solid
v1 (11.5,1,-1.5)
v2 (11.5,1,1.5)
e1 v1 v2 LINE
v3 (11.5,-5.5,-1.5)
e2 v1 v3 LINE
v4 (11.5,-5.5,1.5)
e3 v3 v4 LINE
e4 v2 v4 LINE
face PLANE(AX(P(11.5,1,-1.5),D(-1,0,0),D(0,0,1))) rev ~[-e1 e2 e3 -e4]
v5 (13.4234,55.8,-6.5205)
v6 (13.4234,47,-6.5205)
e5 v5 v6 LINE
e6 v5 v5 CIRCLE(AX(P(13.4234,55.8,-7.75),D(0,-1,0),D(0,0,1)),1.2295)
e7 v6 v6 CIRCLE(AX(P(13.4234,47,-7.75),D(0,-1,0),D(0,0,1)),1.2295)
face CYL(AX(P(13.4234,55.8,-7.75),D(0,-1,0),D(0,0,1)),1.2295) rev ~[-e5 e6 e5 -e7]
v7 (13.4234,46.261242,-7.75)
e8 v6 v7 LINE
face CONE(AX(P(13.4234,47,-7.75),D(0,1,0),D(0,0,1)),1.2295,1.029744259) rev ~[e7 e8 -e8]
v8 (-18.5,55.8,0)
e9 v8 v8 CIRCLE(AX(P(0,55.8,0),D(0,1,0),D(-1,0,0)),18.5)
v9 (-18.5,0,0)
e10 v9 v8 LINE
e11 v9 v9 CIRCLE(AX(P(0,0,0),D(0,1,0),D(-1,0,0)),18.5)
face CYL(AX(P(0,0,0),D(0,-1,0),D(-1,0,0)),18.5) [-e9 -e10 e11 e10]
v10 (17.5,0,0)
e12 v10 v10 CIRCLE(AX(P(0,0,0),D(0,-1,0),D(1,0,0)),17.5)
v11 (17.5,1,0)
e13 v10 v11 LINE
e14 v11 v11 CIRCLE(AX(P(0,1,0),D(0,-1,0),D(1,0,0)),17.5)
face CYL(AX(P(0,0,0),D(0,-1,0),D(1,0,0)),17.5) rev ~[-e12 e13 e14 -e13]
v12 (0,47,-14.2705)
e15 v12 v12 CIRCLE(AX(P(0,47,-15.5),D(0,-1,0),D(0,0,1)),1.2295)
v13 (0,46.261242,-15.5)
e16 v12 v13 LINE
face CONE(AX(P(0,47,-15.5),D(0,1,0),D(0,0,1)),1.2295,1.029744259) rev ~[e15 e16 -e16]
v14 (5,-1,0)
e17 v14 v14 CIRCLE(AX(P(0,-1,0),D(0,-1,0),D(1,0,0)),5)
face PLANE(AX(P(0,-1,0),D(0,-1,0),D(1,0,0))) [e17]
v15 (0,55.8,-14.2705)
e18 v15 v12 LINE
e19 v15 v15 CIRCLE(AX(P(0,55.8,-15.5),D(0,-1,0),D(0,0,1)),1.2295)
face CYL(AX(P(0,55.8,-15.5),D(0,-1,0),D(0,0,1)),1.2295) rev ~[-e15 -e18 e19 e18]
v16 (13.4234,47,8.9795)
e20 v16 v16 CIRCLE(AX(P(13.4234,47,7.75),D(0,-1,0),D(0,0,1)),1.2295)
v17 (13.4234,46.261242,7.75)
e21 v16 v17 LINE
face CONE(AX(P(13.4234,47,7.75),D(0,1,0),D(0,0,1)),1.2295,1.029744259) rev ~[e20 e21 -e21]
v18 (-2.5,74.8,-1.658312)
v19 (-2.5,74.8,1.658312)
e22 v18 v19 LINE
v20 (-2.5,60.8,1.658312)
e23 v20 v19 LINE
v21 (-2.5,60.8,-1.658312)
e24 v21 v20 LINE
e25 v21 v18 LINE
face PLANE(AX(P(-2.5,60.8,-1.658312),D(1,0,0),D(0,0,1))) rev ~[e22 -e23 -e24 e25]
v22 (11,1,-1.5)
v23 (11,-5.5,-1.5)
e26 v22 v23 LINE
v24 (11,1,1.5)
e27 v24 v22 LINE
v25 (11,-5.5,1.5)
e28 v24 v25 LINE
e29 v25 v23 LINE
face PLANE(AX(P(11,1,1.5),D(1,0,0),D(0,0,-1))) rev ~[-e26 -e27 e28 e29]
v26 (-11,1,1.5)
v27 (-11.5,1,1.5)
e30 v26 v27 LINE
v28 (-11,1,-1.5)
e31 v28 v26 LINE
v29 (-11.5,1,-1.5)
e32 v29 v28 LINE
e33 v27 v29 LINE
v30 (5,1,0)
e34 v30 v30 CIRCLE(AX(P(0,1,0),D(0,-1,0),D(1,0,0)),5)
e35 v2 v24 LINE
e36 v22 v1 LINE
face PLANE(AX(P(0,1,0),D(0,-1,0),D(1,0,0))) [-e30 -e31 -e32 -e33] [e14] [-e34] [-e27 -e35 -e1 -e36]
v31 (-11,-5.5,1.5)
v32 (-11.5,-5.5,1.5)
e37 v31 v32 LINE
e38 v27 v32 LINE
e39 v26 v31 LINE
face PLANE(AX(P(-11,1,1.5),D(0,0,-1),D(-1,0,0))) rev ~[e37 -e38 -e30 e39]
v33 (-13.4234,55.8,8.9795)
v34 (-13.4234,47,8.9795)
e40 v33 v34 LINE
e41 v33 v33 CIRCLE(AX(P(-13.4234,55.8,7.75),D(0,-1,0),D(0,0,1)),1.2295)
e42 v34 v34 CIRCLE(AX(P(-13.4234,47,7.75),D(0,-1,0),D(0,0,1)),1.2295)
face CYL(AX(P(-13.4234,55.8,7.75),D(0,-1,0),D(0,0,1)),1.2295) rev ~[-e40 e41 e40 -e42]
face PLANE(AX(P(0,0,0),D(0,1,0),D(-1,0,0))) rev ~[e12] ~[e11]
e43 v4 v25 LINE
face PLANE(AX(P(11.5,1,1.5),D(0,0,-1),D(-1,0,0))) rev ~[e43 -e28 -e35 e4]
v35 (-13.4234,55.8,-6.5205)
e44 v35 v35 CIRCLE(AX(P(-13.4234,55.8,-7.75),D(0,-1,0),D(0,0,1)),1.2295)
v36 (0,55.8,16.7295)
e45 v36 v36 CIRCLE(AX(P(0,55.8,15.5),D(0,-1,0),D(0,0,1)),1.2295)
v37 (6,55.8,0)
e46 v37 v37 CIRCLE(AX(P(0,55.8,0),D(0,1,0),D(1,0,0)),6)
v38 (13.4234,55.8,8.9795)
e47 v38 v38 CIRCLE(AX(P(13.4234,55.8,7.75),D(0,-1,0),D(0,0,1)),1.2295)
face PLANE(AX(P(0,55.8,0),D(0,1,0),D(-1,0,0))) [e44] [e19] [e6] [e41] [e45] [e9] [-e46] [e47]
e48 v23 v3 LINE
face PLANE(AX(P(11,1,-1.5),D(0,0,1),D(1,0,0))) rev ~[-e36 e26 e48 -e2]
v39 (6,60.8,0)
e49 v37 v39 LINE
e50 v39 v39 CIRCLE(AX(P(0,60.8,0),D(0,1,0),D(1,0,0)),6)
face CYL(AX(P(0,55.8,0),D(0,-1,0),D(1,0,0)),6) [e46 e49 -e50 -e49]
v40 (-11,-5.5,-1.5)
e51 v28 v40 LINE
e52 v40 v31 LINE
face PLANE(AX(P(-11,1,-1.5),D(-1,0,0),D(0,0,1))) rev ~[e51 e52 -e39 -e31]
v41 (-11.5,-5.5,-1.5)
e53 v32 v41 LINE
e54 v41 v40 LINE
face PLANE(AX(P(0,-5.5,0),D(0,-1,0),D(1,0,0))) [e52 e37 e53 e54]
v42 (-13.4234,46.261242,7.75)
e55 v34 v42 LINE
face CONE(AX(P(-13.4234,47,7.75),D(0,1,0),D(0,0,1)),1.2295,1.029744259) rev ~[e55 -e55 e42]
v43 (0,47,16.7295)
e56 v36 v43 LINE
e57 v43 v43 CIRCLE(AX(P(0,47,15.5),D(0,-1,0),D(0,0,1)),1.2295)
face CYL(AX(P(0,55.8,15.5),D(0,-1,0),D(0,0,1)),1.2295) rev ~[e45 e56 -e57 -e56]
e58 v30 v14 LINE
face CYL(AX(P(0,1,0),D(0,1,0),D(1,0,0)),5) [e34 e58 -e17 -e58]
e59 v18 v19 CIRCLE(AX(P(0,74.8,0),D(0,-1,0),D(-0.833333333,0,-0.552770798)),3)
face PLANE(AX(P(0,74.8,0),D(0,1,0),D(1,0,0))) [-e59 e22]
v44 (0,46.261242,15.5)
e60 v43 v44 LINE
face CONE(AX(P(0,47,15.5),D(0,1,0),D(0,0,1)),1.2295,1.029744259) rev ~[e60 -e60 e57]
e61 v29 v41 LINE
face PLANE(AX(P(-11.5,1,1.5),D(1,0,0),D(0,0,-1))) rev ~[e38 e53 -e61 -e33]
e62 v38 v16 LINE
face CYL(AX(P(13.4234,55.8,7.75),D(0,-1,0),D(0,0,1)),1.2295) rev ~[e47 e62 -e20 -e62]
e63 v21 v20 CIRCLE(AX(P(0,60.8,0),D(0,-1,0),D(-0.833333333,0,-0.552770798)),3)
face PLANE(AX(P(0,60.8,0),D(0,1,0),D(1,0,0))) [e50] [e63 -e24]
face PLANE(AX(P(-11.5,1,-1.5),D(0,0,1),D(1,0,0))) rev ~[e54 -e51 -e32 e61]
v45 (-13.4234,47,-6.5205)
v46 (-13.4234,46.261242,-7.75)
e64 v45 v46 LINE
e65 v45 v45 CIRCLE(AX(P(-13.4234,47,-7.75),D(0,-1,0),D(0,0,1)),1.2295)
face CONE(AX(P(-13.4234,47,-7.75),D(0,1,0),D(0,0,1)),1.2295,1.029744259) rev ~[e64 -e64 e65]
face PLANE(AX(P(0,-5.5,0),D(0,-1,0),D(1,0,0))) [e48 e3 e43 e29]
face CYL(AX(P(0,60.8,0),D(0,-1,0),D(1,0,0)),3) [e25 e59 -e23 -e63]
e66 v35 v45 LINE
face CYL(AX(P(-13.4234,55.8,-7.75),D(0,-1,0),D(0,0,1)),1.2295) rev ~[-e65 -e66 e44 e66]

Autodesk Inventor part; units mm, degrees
ref_plane "YZ Plane" through (0, 0, 0) normal (1, 0, 0) x (0, 1, 0)
ref_plane "XZ Plane" through (0, 0, 0) normal (0, 1, 0) x (-1, 0, 0)
ref_plane "XY Plane" through (0, 0, 0) normal (0, 0, 1) x (1, 0, 0)
sketch "Sketch1" plane through (0, 0, 0) normal (0, 1, 0) x (-1, 0, 0)
  circle A0 centre (0, 0) radius 18.5
  dimension "d0" = 37
extrude "Extrusion1" add sketch "Sketch1" along normal blind 55.8
sketch "Sketch2" plane through (0, 55.8, 0) normal (0, 1, 0) x (1, 0, 0)
  circle A0 centre (0, 0) radius 6
  dimension "d3" = 12
extrude "Extrusion2" add sketch "Sketch2" along normal blind 5
sketch "Sketch3" plane through (0, 60.8, 0) normal (0, 1, 0) x (1, 0, 0)
  circle A0 centre (0, 0) radius 3
  line L0 (-2.5, -3) -> (3, -3)
  line L1 (3, -3) -> (3, 3)
  line L2 (3, 3) -> (-2.5, 3)
  line L3 (-2.5, 3) -> (-2.5, -3)
  point P0 (-2.5, 1.6583)
  point P1 (-2.5, -1.6583)
  dimension "d6" = 6
  dimension "d7" = 5.5
extrude "Extrusion3" add sketch "Sketch3" along normal blind 14 contours A0 L3 picked at (0.6006, -0.3482)
sketch "Sketch4" plane through (0, 0, 0) normal (0, -1, 0) x (1, 0, 0)
  circle A0 centre (0, 0) radius 17.5
  circle A1 centre (0, 0) radius 18.5 projected
  dimension "d27" = 1
extrude "Extrusion4" cut sketch "Sketch4" against normal blind 1 contours A0
sketch "Sketch5" plane through (0, 1, 0) normal (0, -1, 0) x (1, 0, 0)
  circle A0 centre (0, 0) radius 18.5 projected
  circle A1 centre (0, 0) radius 5
  dimension "d13" = 10
extrude "Extrusion5" add sketch "Sketch5" along normal blind 2 contours A1
sketch "Sketch7" plane through (0, 55.8, 0) normal (0, 1, 0) x (1, 0, 0)
  line L0 (0, 25.9) -> (0, -25.9) projected
  point P0 (0, 0)
  point P1 (0, 15.5)
  point P2 (-13.4234, 7.75)
  point P3 (-13.4234, -7.75)
  point P4 (0, -15.5)
  point P5 (13.4234, -7.75)
  point P6 (13.4234, 7.75)
  dimension "d35" = 15.5
  dimension "d38" = 360
hole "Hole1" at (-13.4234, 55.8, -7.75) at (-13.4234, 55.8, 7.75) at (13.4234, 55.8, 7.75) at (13.4234, 55.8, -7.75) at (0, 55.8, -15.5) at (0, 55.8, 15.5) direction (0, -1, 0) diameter 2.459 depth 8.8 tip angle 118 thread size "M3x0.5" class "6H" standard "ANSI Metric M Profile"
sketch "Sketch8" plane through (0, 1, 0) normal (0, -1, 0) x (1, 0, 0)
  line L0 (-11.5, -1.5) -> (-11, -1.5)
  line L1 (-11, -1.5) -> (-11, 1.5)
  line L2 (-11, 1.5) -> (-11.5, 1.5)
  line L3 (-11.5, 1.5) -> (-11.5, -1.5)
  line L4 (11, -1.5) -> (11.5, -1.5)
  line L5 (11.5, -1.5) -> (11.5, 1.5)
  line L6 (11.5, 1.5) -> (11, 1.5)
  line L7 (11, 1.5) -> (11, -1.5)
  circle A0 centre (0, 0) radius 5 projected
  circle A1 centre (0, 0) radius 17.5 projected
  line L8 (0, -17.5) -> (0, 17.5) construction
  point P0 (-11, 0)
  point P1 (11, 0)
  dimension "d30" = 23
  dimension "d31" = 0.5
  dimension "d32" = 0.5
  dimension "d33" = 3
  dimension "d34" = 3
extrude "Extrusion7" add sketch "Sketch8" along normal blind 6.5 contours L3 L2 L1 L0 | L7 L6 L5 L4
properties part number "Motor24V_V1" material "Steel"
